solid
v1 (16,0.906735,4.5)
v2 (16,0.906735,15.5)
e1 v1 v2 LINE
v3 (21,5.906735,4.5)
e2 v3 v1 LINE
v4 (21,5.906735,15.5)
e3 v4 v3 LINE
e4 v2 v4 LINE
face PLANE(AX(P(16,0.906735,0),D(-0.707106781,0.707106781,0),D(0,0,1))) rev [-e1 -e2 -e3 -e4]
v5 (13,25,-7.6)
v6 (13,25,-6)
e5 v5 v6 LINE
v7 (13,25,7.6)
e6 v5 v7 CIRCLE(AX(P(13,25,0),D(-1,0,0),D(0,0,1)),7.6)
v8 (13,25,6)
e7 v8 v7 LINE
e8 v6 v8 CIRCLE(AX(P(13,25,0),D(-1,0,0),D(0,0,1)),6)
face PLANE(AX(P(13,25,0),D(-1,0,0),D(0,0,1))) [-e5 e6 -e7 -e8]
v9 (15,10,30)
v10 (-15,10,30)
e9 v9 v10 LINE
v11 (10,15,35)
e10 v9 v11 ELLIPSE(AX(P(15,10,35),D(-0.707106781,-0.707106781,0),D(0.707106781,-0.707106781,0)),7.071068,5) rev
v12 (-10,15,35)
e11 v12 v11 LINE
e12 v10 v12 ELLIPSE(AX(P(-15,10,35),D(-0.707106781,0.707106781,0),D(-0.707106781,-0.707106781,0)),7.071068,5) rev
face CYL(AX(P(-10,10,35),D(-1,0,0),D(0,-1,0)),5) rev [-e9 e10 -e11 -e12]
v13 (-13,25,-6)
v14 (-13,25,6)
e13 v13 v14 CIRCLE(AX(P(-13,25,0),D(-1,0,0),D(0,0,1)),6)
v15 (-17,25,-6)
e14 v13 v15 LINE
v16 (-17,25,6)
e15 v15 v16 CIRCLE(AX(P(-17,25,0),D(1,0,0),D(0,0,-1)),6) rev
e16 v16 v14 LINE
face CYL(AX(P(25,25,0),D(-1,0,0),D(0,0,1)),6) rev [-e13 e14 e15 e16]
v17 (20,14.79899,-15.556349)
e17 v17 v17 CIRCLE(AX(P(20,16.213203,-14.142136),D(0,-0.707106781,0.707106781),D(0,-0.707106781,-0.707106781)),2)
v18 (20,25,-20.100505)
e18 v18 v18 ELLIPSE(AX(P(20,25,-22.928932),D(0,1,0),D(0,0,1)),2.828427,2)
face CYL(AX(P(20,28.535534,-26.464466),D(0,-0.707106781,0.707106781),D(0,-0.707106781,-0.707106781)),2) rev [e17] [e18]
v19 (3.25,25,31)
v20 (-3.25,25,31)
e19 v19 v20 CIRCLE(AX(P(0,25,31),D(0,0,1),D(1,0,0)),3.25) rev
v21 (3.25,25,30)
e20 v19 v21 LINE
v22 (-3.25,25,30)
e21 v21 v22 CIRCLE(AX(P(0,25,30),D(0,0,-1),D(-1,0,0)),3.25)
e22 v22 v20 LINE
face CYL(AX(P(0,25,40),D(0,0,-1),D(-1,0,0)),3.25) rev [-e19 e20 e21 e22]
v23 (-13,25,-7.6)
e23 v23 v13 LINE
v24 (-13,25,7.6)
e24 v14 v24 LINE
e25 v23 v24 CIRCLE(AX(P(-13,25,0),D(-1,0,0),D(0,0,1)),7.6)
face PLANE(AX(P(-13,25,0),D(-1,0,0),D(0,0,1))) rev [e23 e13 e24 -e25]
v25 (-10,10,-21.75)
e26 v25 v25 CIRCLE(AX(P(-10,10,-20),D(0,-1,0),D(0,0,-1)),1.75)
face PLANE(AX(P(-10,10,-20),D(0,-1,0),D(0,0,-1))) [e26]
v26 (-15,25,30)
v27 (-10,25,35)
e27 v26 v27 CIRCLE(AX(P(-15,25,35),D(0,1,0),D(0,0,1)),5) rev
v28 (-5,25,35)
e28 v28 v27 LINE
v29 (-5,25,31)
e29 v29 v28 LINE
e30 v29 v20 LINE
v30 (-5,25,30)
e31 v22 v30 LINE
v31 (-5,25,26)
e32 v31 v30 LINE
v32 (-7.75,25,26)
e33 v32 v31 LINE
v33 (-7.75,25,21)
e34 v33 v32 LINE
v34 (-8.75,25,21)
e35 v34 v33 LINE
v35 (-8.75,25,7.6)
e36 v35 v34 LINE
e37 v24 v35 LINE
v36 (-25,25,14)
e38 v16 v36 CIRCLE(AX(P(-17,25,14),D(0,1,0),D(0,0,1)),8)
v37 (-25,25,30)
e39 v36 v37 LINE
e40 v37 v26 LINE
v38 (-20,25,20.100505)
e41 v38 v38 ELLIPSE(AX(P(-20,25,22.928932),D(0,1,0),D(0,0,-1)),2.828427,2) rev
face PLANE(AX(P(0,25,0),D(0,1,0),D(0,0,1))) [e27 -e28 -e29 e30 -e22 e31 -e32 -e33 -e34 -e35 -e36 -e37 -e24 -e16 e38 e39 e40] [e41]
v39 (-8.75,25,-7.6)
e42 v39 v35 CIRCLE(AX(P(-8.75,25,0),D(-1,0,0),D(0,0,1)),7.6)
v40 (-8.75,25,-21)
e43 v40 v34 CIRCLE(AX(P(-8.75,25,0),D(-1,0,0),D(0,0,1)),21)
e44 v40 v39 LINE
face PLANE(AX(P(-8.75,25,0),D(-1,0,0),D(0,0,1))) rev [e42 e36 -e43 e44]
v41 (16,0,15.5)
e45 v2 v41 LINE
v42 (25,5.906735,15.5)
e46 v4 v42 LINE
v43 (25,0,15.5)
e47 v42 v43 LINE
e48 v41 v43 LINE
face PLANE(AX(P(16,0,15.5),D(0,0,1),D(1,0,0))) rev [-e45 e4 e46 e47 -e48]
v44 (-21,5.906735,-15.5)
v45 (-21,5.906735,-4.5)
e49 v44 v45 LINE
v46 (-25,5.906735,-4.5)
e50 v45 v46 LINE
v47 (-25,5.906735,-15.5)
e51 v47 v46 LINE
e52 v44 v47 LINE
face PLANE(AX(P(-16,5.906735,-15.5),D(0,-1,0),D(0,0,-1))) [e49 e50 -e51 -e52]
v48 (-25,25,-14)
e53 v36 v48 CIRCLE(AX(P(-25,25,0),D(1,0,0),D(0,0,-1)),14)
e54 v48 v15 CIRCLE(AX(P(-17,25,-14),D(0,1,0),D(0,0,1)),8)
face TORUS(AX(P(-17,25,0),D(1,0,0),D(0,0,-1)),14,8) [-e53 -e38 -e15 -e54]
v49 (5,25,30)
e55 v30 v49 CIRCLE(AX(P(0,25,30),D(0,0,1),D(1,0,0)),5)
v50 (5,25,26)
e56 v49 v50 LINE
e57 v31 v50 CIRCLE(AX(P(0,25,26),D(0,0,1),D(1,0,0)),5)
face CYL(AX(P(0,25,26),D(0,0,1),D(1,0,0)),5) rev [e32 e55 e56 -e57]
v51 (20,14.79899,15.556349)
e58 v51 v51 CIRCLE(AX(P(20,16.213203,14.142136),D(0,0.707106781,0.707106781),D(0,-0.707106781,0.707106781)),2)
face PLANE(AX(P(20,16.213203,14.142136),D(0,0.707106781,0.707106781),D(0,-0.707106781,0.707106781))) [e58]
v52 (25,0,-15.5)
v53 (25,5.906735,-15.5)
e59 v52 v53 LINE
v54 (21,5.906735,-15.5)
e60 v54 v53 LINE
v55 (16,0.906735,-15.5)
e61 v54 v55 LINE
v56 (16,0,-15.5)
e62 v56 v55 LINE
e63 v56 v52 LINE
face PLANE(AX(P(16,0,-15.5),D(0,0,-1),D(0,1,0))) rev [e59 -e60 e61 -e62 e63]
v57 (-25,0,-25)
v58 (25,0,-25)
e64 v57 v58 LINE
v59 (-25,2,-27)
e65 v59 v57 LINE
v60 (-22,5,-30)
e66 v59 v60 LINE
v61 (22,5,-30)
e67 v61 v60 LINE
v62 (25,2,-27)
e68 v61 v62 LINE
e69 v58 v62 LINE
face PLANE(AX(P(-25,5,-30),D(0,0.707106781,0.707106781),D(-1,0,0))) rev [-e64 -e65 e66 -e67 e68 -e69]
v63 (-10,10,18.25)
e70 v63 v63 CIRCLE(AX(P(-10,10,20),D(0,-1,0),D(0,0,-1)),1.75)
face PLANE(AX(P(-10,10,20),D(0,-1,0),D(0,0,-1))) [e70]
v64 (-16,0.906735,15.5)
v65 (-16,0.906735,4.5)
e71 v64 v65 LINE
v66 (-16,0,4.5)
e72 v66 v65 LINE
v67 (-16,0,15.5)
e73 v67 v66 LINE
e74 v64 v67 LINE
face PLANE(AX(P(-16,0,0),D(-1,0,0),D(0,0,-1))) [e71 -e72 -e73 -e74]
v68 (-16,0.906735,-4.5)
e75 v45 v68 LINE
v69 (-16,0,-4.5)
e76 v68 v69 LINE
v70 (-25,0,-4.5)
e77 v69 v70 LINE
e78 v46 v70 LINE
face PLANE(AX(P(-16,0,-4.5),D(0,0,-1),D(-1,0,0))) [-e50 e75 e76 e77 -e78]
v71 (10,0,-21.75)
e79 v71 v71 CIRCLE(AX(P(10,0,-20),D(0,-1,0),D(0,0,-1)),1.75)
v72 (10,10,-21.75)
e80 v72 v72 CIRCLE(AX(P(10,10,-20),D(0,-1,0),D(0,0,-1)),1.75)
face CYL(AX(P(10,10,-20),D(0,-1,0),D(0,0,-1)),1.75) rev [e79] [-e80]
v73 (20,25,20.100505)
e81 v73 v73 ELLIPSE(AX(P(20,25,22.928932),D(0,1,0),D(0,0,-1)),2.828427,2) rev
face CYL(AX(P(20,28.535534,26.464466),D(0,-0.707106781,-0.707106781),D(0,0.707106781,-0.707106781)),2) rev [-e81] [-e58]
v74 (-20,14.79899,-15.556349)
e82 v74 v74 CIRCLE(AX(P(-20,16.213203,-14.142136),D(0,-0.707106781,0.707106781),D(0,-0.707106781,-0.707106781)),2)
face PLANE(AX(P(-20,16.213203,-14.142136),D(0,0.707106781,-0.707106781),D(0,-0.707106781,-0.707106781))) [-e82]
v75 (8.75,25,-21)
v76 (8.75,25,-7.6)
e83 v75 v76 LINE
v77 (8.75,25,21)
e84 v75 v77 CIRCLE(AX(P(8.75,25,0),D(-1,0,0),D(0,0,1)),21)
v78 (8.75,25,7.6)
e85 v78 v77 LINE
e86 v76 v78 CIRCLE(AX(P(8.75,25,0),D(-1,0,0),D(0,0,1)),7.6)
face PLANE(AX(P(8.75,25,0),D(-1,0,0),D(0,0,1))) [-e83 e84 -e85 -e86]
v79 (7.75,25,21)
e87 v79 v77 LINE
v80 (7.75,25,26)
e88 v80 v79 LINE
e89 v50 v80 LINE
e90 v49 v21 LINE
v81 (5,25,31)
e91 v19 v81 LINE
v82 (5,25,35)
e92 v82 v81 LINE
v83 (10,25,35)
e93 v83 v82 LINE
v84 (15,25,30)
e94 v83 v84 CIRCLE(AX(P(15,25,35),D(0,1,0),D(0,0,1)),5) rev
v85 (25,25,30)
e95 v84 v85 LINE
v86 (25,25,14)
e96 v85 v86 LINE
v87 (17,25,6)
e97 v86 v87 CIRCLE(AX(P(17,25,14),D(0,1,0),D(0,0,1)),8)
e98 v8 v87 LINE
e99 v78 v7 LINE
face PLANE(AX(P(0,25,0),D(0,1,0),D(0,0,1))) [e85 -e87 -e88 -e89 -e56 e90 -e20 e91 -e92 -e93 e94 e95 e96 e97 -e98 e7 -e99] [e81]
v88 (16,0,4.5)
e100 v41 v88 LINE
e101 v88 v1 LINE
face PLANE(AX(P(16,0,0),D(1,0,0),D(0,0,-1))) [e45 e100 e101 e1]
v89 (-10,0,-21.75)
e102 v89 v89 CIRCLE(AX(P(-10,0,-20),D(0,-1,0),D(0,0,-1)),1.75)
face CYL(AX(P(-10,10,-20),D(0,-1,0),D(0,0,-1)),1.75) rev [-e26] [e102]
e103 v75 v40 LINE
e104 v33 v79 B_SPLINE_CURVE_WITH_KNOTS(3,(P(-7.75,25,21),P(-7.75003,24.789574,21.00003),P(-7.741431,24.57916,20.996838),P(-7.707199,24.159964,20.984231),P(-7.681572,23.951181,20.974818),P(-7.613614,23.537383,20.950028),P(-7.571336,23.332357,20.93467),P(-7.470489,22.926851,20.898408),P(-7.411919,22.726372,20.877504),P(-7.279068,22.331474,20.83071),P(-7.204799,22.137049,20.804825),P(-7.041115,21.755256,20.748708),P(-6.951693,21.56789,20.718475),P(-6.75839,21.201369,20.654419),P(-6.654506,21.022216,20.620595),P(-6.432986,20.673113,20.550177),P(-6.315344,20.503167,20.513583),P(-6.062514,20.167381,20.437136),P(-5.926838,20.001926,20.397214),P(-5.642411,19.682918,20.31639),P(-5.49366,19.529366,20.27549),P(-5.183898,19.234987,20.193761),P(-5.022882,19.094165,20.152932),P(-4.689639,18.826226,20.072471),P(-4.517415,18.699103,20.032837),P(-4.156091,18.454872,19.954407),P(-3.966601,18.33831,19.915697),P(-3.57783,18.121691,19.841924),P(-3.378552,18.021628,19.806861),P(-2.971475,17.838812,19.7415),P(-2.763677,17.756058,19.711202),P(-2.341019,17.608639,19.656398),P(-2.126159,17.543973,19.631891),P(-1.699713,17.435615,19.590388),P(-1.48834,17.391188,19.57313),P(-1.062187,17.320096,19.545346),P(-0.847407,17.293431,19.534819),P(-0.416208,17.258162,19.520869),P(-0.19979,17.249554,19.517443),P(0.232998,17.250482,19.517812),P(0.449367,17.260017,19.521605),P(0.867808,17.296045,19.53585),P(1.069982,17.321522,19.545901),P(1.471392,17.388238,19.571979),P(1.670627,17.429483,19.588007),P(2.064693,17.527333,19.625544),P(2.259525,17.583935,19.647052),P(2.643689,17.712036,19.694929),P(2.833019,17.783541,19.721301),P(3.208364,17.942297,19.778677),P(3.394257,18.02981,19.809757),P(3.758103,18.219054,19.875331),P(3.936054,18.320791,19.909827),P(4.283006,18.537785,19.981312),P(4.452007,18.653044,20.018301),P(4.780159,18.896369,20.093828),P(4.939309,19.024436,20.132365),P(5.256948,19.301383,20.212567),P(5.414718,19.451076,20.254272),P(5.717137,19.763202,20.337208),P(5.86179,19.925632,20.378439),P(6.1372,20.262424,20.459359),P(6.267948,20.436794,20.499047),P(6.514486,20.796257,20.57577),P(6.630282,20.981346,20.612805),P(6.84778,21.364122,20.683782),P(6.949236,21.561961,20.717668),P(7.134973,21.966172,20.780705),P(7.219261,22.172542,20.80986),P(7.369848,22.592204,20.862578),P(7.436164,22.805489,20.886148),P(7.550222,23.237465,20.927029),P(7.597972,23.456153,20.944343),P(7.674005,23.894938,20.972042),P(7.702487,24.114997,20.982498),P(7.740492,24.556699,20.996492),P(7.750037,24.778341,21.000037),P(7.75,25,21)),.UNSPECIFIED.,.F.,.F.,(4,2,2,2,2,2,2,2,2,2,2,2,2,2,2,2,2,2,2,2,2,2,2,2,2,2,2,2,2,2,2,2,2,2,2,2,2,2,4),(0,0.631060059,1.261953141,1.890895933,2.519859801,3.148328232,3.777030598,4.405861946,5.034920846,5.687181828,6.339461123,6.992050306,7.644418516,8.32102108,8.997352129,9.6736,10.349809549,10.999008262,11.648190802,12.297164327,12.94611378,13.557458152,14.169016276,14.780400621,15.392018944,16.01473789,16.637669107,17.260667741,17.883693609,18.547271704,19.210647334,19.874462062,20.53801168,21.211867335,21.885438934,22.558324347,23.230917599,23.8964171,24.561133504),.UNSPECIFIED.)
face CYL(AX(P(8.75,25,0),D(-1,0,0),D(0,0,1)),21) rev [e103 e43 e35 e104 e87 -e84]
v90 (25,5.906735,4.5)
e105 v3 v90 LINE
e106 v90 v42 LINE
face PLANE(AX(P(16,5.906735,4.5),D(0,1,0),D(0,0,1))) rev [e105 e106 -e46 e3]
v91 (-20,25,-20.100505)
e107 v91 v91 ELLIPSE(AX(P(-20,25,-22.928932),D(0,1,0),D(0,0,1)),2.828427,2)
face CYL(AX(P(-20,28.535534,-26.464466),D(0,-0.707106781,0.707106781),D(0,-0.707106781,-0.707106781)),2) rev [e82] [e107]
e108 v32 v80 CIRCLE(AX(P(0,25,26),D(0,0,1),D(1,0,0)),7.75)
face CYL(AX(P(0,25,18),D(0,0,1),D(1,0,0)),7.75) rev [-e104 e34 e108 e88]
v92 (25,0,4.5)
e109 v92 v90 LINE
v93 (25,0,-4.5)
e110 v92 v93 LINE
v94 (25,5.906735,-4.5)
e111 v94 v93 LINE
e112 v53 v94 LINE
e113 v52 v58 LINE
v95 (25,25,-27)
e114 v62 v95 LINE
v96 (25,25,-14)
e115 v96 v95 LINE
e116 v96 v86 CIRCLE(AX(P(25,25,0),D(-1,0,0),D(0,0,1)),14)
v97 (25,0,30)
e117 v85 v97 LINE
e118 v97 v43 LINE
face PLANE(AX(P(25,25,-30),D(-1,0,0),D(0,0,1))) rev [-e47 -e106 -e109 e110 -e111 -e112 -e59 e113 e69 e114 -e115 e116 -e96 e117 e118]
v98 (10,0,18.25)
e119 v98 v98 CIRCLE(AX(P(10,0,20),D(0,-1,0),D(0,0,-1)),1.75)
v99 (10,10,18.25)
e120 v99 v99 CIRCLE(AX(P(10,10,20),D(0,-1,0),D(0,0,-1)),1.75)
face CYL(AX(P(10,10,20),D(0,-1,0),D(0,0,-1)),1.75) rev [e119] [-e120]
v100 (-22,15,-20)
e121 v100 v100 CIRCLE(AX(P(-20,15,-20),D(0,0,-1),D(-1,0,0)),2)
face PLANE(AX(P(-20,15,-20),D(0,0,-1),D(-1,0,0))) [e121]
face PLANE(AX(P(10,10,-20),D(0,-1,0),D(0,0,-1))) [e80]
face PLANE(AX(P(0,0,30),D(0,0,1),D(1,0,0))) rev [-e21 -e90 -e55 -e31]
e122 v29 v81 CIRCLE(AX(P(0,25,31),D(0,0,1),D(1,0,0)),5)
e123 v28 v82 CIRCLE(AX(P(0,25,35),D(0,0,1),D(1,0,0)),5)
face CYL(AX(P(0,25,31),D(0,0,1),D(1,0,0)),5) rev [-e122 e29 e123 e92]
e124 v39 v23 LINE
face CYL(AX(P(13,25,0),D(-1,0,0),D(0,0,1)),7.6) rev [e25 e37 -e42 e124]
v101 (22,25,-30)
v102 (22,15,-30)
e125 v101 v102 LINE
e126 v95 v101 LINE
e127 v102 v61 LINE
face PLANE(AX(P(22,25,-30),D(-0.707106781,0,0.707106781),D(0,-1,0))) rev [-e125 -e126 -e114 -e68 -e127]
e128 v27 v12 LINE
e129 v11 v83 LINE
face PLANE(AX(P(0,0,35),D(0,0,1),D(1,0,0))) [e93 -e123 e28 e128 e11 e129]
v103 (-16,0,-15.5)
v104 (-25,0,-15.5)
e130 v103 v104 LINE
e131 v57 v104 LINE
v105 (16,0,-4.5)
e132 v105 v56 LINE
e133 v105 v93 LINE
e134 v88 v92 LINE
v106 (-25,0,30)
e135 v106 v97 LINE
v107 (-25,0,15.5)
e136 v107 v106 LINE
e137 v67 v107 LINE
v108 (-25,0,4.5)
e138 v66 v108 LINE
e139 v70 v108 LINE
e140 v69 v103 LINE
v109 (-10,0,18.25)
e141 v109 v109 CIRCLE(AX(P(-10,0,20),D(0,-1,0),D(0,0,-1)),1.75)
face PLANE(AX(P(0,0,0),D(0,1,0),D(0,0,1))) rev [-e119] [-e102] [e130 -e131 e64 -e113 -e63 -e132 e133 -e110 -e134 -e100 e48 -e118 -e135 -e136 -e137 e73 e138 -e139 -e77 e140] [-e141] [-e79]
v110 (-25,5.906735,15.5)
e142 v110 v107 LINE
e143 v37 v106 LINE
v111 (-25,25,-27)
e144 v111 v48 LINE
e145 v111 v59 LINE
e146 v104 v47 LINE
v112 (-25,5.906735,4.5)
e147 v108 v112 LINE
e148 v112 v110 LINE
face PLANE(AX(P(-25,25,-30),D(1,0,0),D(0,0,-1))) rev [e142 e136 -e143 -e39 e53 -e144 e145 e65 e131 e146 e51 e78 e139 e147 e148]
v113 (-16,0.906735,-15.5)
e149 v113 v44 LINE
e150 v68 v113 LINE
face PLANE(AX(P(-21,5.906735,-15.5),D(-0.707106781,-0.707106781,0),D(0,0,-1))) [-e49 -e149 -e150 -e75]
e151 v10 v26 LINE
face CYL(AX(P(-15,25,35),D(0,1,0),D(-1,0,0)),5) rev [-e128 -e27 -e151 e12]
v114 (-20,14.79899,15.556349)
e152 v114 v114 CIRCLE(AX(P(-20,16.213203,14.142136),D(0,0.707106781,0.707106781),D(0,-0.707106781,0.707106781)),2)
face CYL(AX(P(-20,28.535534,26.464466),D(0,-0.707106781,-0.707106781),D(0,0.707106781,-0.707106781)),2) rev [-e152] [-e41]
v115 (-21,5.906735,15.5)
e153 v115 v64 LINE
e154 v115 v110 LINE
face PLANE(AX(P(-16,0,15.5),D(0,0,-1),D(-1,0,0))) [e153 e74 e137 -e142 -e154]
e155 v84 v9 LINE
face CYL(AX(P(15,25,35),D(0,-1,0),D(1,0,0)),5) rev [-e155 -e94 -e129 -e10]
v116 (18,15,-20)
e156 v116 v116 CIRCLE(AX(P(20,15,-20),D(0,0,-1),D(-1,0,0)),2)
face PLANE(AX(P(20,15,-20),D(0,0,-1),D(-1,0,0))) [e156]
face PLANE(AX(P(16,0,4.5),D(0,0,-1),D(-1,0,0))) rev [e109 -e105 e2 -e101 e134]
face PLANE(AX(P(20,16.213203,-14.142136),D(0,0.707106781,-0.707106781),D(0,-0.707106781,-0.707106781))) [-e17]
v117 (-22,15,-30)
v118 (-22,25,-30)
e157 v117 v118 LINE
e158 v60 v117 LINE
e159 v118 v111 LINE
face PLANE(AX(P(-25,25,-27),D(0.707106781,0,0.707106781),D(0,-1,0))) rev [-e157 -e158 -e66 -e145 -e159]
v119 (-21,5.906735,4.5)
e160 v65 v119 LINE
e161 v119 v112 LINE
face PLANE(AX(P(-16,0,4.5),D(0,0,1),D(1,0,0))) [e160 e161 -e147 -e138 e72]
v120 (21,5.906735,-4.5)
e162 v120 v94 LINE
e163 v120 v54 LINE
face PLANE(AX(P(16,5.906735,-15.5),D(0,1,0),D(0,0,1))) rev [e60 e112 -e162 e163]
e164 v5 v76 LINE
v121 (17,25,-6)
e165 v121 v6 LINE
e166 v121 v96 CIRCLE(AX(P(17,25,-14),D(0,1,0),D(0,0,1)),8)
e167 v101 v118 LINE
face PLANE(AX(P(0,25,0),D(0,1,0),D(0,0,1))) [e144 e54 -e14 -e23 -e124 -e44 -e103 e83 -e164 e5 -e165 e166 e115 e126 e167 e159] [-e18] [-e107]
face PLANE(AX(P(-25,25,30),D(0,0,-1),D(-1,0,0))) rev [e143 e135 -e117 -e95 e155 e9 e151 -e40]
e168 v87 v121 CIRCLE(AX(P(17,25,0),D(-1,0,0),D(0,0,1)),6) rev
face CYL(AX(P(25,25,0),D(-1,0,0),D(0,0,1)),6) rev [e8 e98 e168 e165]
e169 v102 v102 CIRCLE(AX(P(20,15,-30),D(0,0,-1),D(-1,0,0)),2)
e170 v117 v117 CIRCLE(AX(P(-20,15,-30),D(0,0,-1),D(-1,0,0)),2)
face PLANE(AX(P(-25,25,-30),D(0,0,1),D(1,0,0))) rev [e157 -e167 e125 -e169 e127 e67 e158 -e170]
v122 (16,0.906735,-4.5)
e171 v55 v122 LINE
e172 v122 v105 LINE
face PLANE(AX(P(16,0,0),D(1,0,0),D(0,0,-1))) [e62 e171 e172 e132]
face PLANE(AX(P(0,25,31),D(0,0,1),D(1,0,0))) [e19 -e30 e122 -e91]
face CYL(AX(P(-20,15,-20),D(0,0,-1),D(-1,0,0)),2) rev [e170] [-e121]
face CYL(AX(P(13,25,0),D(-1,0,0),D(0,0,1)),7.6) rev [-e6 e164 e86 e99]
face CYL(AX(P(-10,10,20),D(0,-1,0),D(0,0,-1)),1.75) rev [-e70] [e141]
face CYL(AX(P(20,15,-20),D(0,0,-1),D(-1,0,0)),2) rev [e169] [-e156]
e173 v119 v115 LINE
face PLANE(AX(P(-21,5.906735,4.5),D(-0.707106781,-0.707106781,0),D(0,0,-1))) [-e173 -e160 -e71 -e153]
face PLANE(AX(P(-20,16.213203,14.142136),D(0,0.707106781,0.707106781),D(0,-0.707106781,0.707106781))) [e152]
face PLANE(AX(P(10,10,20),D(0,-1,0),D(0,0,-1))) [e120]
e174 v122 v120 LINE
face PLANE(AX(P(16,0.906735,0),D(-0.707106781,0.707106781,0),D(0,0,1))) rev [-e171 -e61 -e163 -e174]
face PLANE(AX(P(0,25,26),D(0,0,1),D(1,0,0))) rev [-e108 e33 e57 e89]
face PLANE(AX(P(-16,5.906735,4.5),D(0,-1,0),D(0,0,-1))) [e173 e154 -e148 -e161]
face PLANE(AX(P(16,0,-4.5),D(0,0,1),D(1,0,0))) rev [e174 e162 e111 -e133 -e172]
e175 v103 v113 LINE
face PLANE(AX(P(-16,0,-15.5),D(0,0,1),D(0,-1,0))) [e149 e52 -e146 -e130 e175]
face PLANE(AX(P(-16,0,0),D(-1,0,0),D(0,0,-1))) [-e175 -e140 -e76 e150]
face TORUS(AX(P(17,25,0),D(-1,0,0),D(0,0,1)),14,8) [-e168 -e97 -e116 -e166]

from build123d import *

# Parameters (mm, degrees)
SKETCH1_W                = 50
SKETCH1_H                = 60
BOSS_EXTRUDE1_DEPTH      = 25
CUT_EXTRUDE1_START       = -16.25
SKETCH2_R                = 21
CUT_EXTRUDE1_DEPTH       = 17.5
CUT_EXTRUDE2_START       = -12
SKETCH3_R                = 7.6
CUT_EXTRUDE2_DEPTH       = 26
SKETCH4_R                = 5
CUT_EXTRUDE3_DEPTH       = 4
SKETCH5_R                = 1.75
CUT_EXTRUDE4_DEPTH       = 10
CHAMFER1_SIZE            = 5
SKETCH6_R                = 2
CUT_EXTRUDE5_DEPTH       = 10
SKETCH7_W                = 11
SKETCH7_H                = 5.906734889
CUT_EXTRUDE6_DEPTH       = 9
CHAMFER2_SIZE            = 5
CHAMFER2_OF_MIRROR1_SIZE = 5
CHAMFER3_SIZE            = 3
CUT_EXTRUDE8_START       = 25
SKETCH10_R               = 2
CUT_EXTRUDE8_DEPTH       = 25.371044145
CUT_EXTRUDE10_DEPTH      = 64.442887702
CUT_EXTRUDE10_DEPTH_BACK = 64.442887702
SKETCH12_R               = 6
FILLET1_R                = 8
SKETCH16_R               = 7.75
CUT_EXTRUDE13_DEPTH      = 8
SKETCH17_W               = 20
SKETCH17_H               = 10
BOSS_EXTRUDE2_DEPTH      = 5
SKETCH18_R               = 3.25
CUT_EXTRUDE14_DEPTH      = 10
SKETCH19_R               = 5
CUT_EXTRUDE15_DEPTH      = 4
FILLET2_R                = 5


with BuildPart() as part:
    # Sketch1 → Boss-Extrude1 (new body)
    with BuildSketch(Plane(origin=(0, 0, 0), x_dir=(1, 0, 0), z_dir=(0, 1, 0))):
        Rectangle(SKETCH1_W, SKETCH1_H)
    extrude(amount=BOSS_EXTRUDE1_DEPTH)

    # Sketch2 → Cut-Extrude1 (cut)
    with BuildSketch(Plane.ZY.offset(25).offset(CUT_EXTRUDE1_START)):
        with Locations((0, 25)):
            Circle(SKETCH2_R)
    extrude(amount=-CUT_EXTRUDE1_DEPTH, mode=Mode.SUBTRACT)

    # Sketch3 → Cut-Extrude2 (cut)
    with BuildSketch(Plane.ZY.offset(25).offset(CUT_EXTRUDE2_START)):
        with Locations((0, 25)):
            Circle(SKETCH3_R)
    extrude(amount=-CUT_EXTRUDE2_DEPTH, mode=Mode.SUBTRACT)

    # Sketch4 → Cut-Extrude3 (cut)
    with BuildSketch(Plane.XY.offset(30)):
        with Locations((0, 25)):
            Circle(SKETCH4_R)
    extrude(amount=-CUT_EXTRUDE3_DEPTH, mode=Mode.SUBTRACT)

    # Sketch5 → Cut-Extrude4 (cut)
    with BuildSketch(Plane.XZ):
        with Locations(Location((-10, 20, 0), (0, 0, 270))):
            Circle(SKETCH5_R)
        with Locations(Location((10, 20, 0), (0, 0, 270))):
            Circle(SKETCH5_R)
        with Locations(Location((-10, -20, 0), (0, 0, 270))):
            Circle(SKETCH5_R)
        with Locations(Location((10, -20, 0), (0, 0, 270))):
            Circle(SKETCH5_R)
    extrude(amount=-CUT_EXTRUDE4_DEPTH, mode=Mode.SUBTRACT)

    # Chamfer1
    chamfer1_edges = [part.edges().sort_by_distance(p)[0] for p in [
        (0, 0, -30),
    ]]
    chamfer(chamfer1_edges, length=CHAMFER1_SIZE)

    # Sketch6 → Cut-Extrude5 (cut)
    with BuildSketch(Plane(origin=(0, 0, -30), x_dir=(-1, 0, 0), z_dir=(0, 0, -1))):
        with Locations((-20, 15)):
            Circle(SKETCH6_R)
        with Locations((20, 15)):
            Circle(SKETCH6_R)
    extrude(amount=-CUT_EXTRUDE5_DEPTH, mode=Mode.SUBTRACT)

    # Sketch7 → Cut-Extrude6 (cut)
    with BuildSketch(Plane(origin=(25, 0, 0), x_dir=(0, 0, -1), z_dir=(1, 0, 0))):
        with Locations((-10, 2.953367444)):
            Rectangle(SKETCH7_W, SKETCH7_H)
        with Locations((10, 2.953367444)):
            Rectangle(SKETCH7_W, SKETCH7_H)
    cut_extrude6 = extrude(amount=-CUT_EXTRUDE6_DEPTH, mode=Mode.SUBTRACT)

    # Chamfer2
    chamfer2_edges = [part.edges().sort_by_distance(p)[0] for p in [
        (16, 5.906734889, 10),
        (16, 5.906734889, -10),
    ]]
    chamfer(chamfer2_edges, length=CHAMFER2_SIZE)

    # Mirror1: Cut-Extrude6 across plane
    add(cut_extrude6.mirror(Plane(origin=(0, 0, 0), x_dir=(0, 0, 1), z_dir=(1, 0, 0))), mode=Mode.SUBTRACT)

    # Chamfer2 of Mirror1
    chamfer2_of_mirror1_edges = [part.edges().sort_by_distance(p)[0] for p in [
        (-16, 5.906734889, 10),
        (-16, 5.906734889, -10),
    ]]
    chamfer(chamfer2_of_mirror1_edges, length=CHAMFER2_OF_MIRROR1_SIZE)

    # Chamfer3
    chamfer3_edges = [part.edges().sort_by_distance(p)[0] for p in [
        (-25, 15, -30),
        (25, 15, -30),
    ]]
    chamfer(chamfer3_edges, length=CHAMFER3_SIZE - 0.0001)  # a hair under: the kernel refuses the full size

    # Sketch10 → Cut-Extrude8 (cut, through all)
    with BuildSketch(Plane(origin=(0, -2.5, -2.5), x_dir=(1, 0, 0), z_dir=(0, 0.7071067811865475, 0.7071067811865477)).offset(CUT_EXTRUDE8_START)):
        with Locations(Location((-20, 1.464466094, 0), (0, 0, 90))):
            Circle(SKETCH10_R)
        with Locations(Location((20, 1.464466094, 0), (0, 0, 90))):
            Circle(SKETCH10_R)
    cut_extrude8 = extrude(amount=CUT_EXTRUDE8_DEPTH, mode=Mode.SUBTRACT)

    # Mirror2: Cut-Extrude8 across plane
    add(cut_extrude8.mirror(Plane.XY), mode=Mode.SUBTRACT)

    # Sketch12 → Cut-Extrude10 (cut, two sides: drawn at the far end of the back side and taken through both)
    with BuildSketch(Plane.ZY.offset(25).offset(-CUT_EXTRUDE10_DEPTH_BACK)):
        with Locations((0, 25)):
            Circle(SKETCH12_R)
    extrude(amount=CUT_EXTRUDE10_DEPTH + CUT_EXTRUDE10_DEPTH_BACK, mode=Mode.SUBTRACT)

    # Fillet1
    fillet1_edges = [part.edges().sort_by_distance(p)[0] for p in [
        (25, 19, 0),
        (-25, 19, 0),
    ]]
    fillet(fillet1_edges, radius=FILLET1_R)

    # Sketch16 → Cut-Extrude13 (cut)
    with BuildSketch(Plane.XY.offset(26)):
        with Locations((0, 25)):
            Circle(SKETCH16_R)
    extrude(amount=-CUT_EXTRUDE13_DEPTH, mode=Mode.SUBTRACT)

    # Sketch17 → Boss-Extrude2 (add)
    with BuildSketch(Plane.XY.offset(30)):
        with Locations((0, 20)):
            Rectangle(SKETCH17_W, SKETCH17_H)
    extrude(amount=BOSS_EXTRUDE2_DEPTH)

    # Sketch18 → Cut-Extrude14 (cut)
    with BuildSketch(Plane(origin=(0, 0, 30), x_dir=(-1, 0, 0), z_dir=(0, 0, -1))):
        with Locations((0, 25)):
            Circle(SKETCH18_R)
    extrude(amount=-CUT_EXTRUDE14_DEPTH, mode=Mode.SUBTRACT)

    # Sketch19 → Cut-Extrude15 (cut)
    with BuildSketch(Plane.XY.offset(35)):
        with Locations((0, 25)):
            Circle(SKETCH19_R)
    extrude(amount=-CUT_EXTRUDE15_DEPTH, mode=Mode.SUBTRACT)

    # Fillet2
    fillet2_edges = [part.edges().sort_by_distance(p)[0] for p in [
        (-10, 20, 30),
        (0, 15, 30),
        (10, 20, 30),
    ]]
    fillet(fillet2_edges, radius=FILLET2_R - 0.0001)  # a hair under: the kernel refuses the full size


solid = part.part
